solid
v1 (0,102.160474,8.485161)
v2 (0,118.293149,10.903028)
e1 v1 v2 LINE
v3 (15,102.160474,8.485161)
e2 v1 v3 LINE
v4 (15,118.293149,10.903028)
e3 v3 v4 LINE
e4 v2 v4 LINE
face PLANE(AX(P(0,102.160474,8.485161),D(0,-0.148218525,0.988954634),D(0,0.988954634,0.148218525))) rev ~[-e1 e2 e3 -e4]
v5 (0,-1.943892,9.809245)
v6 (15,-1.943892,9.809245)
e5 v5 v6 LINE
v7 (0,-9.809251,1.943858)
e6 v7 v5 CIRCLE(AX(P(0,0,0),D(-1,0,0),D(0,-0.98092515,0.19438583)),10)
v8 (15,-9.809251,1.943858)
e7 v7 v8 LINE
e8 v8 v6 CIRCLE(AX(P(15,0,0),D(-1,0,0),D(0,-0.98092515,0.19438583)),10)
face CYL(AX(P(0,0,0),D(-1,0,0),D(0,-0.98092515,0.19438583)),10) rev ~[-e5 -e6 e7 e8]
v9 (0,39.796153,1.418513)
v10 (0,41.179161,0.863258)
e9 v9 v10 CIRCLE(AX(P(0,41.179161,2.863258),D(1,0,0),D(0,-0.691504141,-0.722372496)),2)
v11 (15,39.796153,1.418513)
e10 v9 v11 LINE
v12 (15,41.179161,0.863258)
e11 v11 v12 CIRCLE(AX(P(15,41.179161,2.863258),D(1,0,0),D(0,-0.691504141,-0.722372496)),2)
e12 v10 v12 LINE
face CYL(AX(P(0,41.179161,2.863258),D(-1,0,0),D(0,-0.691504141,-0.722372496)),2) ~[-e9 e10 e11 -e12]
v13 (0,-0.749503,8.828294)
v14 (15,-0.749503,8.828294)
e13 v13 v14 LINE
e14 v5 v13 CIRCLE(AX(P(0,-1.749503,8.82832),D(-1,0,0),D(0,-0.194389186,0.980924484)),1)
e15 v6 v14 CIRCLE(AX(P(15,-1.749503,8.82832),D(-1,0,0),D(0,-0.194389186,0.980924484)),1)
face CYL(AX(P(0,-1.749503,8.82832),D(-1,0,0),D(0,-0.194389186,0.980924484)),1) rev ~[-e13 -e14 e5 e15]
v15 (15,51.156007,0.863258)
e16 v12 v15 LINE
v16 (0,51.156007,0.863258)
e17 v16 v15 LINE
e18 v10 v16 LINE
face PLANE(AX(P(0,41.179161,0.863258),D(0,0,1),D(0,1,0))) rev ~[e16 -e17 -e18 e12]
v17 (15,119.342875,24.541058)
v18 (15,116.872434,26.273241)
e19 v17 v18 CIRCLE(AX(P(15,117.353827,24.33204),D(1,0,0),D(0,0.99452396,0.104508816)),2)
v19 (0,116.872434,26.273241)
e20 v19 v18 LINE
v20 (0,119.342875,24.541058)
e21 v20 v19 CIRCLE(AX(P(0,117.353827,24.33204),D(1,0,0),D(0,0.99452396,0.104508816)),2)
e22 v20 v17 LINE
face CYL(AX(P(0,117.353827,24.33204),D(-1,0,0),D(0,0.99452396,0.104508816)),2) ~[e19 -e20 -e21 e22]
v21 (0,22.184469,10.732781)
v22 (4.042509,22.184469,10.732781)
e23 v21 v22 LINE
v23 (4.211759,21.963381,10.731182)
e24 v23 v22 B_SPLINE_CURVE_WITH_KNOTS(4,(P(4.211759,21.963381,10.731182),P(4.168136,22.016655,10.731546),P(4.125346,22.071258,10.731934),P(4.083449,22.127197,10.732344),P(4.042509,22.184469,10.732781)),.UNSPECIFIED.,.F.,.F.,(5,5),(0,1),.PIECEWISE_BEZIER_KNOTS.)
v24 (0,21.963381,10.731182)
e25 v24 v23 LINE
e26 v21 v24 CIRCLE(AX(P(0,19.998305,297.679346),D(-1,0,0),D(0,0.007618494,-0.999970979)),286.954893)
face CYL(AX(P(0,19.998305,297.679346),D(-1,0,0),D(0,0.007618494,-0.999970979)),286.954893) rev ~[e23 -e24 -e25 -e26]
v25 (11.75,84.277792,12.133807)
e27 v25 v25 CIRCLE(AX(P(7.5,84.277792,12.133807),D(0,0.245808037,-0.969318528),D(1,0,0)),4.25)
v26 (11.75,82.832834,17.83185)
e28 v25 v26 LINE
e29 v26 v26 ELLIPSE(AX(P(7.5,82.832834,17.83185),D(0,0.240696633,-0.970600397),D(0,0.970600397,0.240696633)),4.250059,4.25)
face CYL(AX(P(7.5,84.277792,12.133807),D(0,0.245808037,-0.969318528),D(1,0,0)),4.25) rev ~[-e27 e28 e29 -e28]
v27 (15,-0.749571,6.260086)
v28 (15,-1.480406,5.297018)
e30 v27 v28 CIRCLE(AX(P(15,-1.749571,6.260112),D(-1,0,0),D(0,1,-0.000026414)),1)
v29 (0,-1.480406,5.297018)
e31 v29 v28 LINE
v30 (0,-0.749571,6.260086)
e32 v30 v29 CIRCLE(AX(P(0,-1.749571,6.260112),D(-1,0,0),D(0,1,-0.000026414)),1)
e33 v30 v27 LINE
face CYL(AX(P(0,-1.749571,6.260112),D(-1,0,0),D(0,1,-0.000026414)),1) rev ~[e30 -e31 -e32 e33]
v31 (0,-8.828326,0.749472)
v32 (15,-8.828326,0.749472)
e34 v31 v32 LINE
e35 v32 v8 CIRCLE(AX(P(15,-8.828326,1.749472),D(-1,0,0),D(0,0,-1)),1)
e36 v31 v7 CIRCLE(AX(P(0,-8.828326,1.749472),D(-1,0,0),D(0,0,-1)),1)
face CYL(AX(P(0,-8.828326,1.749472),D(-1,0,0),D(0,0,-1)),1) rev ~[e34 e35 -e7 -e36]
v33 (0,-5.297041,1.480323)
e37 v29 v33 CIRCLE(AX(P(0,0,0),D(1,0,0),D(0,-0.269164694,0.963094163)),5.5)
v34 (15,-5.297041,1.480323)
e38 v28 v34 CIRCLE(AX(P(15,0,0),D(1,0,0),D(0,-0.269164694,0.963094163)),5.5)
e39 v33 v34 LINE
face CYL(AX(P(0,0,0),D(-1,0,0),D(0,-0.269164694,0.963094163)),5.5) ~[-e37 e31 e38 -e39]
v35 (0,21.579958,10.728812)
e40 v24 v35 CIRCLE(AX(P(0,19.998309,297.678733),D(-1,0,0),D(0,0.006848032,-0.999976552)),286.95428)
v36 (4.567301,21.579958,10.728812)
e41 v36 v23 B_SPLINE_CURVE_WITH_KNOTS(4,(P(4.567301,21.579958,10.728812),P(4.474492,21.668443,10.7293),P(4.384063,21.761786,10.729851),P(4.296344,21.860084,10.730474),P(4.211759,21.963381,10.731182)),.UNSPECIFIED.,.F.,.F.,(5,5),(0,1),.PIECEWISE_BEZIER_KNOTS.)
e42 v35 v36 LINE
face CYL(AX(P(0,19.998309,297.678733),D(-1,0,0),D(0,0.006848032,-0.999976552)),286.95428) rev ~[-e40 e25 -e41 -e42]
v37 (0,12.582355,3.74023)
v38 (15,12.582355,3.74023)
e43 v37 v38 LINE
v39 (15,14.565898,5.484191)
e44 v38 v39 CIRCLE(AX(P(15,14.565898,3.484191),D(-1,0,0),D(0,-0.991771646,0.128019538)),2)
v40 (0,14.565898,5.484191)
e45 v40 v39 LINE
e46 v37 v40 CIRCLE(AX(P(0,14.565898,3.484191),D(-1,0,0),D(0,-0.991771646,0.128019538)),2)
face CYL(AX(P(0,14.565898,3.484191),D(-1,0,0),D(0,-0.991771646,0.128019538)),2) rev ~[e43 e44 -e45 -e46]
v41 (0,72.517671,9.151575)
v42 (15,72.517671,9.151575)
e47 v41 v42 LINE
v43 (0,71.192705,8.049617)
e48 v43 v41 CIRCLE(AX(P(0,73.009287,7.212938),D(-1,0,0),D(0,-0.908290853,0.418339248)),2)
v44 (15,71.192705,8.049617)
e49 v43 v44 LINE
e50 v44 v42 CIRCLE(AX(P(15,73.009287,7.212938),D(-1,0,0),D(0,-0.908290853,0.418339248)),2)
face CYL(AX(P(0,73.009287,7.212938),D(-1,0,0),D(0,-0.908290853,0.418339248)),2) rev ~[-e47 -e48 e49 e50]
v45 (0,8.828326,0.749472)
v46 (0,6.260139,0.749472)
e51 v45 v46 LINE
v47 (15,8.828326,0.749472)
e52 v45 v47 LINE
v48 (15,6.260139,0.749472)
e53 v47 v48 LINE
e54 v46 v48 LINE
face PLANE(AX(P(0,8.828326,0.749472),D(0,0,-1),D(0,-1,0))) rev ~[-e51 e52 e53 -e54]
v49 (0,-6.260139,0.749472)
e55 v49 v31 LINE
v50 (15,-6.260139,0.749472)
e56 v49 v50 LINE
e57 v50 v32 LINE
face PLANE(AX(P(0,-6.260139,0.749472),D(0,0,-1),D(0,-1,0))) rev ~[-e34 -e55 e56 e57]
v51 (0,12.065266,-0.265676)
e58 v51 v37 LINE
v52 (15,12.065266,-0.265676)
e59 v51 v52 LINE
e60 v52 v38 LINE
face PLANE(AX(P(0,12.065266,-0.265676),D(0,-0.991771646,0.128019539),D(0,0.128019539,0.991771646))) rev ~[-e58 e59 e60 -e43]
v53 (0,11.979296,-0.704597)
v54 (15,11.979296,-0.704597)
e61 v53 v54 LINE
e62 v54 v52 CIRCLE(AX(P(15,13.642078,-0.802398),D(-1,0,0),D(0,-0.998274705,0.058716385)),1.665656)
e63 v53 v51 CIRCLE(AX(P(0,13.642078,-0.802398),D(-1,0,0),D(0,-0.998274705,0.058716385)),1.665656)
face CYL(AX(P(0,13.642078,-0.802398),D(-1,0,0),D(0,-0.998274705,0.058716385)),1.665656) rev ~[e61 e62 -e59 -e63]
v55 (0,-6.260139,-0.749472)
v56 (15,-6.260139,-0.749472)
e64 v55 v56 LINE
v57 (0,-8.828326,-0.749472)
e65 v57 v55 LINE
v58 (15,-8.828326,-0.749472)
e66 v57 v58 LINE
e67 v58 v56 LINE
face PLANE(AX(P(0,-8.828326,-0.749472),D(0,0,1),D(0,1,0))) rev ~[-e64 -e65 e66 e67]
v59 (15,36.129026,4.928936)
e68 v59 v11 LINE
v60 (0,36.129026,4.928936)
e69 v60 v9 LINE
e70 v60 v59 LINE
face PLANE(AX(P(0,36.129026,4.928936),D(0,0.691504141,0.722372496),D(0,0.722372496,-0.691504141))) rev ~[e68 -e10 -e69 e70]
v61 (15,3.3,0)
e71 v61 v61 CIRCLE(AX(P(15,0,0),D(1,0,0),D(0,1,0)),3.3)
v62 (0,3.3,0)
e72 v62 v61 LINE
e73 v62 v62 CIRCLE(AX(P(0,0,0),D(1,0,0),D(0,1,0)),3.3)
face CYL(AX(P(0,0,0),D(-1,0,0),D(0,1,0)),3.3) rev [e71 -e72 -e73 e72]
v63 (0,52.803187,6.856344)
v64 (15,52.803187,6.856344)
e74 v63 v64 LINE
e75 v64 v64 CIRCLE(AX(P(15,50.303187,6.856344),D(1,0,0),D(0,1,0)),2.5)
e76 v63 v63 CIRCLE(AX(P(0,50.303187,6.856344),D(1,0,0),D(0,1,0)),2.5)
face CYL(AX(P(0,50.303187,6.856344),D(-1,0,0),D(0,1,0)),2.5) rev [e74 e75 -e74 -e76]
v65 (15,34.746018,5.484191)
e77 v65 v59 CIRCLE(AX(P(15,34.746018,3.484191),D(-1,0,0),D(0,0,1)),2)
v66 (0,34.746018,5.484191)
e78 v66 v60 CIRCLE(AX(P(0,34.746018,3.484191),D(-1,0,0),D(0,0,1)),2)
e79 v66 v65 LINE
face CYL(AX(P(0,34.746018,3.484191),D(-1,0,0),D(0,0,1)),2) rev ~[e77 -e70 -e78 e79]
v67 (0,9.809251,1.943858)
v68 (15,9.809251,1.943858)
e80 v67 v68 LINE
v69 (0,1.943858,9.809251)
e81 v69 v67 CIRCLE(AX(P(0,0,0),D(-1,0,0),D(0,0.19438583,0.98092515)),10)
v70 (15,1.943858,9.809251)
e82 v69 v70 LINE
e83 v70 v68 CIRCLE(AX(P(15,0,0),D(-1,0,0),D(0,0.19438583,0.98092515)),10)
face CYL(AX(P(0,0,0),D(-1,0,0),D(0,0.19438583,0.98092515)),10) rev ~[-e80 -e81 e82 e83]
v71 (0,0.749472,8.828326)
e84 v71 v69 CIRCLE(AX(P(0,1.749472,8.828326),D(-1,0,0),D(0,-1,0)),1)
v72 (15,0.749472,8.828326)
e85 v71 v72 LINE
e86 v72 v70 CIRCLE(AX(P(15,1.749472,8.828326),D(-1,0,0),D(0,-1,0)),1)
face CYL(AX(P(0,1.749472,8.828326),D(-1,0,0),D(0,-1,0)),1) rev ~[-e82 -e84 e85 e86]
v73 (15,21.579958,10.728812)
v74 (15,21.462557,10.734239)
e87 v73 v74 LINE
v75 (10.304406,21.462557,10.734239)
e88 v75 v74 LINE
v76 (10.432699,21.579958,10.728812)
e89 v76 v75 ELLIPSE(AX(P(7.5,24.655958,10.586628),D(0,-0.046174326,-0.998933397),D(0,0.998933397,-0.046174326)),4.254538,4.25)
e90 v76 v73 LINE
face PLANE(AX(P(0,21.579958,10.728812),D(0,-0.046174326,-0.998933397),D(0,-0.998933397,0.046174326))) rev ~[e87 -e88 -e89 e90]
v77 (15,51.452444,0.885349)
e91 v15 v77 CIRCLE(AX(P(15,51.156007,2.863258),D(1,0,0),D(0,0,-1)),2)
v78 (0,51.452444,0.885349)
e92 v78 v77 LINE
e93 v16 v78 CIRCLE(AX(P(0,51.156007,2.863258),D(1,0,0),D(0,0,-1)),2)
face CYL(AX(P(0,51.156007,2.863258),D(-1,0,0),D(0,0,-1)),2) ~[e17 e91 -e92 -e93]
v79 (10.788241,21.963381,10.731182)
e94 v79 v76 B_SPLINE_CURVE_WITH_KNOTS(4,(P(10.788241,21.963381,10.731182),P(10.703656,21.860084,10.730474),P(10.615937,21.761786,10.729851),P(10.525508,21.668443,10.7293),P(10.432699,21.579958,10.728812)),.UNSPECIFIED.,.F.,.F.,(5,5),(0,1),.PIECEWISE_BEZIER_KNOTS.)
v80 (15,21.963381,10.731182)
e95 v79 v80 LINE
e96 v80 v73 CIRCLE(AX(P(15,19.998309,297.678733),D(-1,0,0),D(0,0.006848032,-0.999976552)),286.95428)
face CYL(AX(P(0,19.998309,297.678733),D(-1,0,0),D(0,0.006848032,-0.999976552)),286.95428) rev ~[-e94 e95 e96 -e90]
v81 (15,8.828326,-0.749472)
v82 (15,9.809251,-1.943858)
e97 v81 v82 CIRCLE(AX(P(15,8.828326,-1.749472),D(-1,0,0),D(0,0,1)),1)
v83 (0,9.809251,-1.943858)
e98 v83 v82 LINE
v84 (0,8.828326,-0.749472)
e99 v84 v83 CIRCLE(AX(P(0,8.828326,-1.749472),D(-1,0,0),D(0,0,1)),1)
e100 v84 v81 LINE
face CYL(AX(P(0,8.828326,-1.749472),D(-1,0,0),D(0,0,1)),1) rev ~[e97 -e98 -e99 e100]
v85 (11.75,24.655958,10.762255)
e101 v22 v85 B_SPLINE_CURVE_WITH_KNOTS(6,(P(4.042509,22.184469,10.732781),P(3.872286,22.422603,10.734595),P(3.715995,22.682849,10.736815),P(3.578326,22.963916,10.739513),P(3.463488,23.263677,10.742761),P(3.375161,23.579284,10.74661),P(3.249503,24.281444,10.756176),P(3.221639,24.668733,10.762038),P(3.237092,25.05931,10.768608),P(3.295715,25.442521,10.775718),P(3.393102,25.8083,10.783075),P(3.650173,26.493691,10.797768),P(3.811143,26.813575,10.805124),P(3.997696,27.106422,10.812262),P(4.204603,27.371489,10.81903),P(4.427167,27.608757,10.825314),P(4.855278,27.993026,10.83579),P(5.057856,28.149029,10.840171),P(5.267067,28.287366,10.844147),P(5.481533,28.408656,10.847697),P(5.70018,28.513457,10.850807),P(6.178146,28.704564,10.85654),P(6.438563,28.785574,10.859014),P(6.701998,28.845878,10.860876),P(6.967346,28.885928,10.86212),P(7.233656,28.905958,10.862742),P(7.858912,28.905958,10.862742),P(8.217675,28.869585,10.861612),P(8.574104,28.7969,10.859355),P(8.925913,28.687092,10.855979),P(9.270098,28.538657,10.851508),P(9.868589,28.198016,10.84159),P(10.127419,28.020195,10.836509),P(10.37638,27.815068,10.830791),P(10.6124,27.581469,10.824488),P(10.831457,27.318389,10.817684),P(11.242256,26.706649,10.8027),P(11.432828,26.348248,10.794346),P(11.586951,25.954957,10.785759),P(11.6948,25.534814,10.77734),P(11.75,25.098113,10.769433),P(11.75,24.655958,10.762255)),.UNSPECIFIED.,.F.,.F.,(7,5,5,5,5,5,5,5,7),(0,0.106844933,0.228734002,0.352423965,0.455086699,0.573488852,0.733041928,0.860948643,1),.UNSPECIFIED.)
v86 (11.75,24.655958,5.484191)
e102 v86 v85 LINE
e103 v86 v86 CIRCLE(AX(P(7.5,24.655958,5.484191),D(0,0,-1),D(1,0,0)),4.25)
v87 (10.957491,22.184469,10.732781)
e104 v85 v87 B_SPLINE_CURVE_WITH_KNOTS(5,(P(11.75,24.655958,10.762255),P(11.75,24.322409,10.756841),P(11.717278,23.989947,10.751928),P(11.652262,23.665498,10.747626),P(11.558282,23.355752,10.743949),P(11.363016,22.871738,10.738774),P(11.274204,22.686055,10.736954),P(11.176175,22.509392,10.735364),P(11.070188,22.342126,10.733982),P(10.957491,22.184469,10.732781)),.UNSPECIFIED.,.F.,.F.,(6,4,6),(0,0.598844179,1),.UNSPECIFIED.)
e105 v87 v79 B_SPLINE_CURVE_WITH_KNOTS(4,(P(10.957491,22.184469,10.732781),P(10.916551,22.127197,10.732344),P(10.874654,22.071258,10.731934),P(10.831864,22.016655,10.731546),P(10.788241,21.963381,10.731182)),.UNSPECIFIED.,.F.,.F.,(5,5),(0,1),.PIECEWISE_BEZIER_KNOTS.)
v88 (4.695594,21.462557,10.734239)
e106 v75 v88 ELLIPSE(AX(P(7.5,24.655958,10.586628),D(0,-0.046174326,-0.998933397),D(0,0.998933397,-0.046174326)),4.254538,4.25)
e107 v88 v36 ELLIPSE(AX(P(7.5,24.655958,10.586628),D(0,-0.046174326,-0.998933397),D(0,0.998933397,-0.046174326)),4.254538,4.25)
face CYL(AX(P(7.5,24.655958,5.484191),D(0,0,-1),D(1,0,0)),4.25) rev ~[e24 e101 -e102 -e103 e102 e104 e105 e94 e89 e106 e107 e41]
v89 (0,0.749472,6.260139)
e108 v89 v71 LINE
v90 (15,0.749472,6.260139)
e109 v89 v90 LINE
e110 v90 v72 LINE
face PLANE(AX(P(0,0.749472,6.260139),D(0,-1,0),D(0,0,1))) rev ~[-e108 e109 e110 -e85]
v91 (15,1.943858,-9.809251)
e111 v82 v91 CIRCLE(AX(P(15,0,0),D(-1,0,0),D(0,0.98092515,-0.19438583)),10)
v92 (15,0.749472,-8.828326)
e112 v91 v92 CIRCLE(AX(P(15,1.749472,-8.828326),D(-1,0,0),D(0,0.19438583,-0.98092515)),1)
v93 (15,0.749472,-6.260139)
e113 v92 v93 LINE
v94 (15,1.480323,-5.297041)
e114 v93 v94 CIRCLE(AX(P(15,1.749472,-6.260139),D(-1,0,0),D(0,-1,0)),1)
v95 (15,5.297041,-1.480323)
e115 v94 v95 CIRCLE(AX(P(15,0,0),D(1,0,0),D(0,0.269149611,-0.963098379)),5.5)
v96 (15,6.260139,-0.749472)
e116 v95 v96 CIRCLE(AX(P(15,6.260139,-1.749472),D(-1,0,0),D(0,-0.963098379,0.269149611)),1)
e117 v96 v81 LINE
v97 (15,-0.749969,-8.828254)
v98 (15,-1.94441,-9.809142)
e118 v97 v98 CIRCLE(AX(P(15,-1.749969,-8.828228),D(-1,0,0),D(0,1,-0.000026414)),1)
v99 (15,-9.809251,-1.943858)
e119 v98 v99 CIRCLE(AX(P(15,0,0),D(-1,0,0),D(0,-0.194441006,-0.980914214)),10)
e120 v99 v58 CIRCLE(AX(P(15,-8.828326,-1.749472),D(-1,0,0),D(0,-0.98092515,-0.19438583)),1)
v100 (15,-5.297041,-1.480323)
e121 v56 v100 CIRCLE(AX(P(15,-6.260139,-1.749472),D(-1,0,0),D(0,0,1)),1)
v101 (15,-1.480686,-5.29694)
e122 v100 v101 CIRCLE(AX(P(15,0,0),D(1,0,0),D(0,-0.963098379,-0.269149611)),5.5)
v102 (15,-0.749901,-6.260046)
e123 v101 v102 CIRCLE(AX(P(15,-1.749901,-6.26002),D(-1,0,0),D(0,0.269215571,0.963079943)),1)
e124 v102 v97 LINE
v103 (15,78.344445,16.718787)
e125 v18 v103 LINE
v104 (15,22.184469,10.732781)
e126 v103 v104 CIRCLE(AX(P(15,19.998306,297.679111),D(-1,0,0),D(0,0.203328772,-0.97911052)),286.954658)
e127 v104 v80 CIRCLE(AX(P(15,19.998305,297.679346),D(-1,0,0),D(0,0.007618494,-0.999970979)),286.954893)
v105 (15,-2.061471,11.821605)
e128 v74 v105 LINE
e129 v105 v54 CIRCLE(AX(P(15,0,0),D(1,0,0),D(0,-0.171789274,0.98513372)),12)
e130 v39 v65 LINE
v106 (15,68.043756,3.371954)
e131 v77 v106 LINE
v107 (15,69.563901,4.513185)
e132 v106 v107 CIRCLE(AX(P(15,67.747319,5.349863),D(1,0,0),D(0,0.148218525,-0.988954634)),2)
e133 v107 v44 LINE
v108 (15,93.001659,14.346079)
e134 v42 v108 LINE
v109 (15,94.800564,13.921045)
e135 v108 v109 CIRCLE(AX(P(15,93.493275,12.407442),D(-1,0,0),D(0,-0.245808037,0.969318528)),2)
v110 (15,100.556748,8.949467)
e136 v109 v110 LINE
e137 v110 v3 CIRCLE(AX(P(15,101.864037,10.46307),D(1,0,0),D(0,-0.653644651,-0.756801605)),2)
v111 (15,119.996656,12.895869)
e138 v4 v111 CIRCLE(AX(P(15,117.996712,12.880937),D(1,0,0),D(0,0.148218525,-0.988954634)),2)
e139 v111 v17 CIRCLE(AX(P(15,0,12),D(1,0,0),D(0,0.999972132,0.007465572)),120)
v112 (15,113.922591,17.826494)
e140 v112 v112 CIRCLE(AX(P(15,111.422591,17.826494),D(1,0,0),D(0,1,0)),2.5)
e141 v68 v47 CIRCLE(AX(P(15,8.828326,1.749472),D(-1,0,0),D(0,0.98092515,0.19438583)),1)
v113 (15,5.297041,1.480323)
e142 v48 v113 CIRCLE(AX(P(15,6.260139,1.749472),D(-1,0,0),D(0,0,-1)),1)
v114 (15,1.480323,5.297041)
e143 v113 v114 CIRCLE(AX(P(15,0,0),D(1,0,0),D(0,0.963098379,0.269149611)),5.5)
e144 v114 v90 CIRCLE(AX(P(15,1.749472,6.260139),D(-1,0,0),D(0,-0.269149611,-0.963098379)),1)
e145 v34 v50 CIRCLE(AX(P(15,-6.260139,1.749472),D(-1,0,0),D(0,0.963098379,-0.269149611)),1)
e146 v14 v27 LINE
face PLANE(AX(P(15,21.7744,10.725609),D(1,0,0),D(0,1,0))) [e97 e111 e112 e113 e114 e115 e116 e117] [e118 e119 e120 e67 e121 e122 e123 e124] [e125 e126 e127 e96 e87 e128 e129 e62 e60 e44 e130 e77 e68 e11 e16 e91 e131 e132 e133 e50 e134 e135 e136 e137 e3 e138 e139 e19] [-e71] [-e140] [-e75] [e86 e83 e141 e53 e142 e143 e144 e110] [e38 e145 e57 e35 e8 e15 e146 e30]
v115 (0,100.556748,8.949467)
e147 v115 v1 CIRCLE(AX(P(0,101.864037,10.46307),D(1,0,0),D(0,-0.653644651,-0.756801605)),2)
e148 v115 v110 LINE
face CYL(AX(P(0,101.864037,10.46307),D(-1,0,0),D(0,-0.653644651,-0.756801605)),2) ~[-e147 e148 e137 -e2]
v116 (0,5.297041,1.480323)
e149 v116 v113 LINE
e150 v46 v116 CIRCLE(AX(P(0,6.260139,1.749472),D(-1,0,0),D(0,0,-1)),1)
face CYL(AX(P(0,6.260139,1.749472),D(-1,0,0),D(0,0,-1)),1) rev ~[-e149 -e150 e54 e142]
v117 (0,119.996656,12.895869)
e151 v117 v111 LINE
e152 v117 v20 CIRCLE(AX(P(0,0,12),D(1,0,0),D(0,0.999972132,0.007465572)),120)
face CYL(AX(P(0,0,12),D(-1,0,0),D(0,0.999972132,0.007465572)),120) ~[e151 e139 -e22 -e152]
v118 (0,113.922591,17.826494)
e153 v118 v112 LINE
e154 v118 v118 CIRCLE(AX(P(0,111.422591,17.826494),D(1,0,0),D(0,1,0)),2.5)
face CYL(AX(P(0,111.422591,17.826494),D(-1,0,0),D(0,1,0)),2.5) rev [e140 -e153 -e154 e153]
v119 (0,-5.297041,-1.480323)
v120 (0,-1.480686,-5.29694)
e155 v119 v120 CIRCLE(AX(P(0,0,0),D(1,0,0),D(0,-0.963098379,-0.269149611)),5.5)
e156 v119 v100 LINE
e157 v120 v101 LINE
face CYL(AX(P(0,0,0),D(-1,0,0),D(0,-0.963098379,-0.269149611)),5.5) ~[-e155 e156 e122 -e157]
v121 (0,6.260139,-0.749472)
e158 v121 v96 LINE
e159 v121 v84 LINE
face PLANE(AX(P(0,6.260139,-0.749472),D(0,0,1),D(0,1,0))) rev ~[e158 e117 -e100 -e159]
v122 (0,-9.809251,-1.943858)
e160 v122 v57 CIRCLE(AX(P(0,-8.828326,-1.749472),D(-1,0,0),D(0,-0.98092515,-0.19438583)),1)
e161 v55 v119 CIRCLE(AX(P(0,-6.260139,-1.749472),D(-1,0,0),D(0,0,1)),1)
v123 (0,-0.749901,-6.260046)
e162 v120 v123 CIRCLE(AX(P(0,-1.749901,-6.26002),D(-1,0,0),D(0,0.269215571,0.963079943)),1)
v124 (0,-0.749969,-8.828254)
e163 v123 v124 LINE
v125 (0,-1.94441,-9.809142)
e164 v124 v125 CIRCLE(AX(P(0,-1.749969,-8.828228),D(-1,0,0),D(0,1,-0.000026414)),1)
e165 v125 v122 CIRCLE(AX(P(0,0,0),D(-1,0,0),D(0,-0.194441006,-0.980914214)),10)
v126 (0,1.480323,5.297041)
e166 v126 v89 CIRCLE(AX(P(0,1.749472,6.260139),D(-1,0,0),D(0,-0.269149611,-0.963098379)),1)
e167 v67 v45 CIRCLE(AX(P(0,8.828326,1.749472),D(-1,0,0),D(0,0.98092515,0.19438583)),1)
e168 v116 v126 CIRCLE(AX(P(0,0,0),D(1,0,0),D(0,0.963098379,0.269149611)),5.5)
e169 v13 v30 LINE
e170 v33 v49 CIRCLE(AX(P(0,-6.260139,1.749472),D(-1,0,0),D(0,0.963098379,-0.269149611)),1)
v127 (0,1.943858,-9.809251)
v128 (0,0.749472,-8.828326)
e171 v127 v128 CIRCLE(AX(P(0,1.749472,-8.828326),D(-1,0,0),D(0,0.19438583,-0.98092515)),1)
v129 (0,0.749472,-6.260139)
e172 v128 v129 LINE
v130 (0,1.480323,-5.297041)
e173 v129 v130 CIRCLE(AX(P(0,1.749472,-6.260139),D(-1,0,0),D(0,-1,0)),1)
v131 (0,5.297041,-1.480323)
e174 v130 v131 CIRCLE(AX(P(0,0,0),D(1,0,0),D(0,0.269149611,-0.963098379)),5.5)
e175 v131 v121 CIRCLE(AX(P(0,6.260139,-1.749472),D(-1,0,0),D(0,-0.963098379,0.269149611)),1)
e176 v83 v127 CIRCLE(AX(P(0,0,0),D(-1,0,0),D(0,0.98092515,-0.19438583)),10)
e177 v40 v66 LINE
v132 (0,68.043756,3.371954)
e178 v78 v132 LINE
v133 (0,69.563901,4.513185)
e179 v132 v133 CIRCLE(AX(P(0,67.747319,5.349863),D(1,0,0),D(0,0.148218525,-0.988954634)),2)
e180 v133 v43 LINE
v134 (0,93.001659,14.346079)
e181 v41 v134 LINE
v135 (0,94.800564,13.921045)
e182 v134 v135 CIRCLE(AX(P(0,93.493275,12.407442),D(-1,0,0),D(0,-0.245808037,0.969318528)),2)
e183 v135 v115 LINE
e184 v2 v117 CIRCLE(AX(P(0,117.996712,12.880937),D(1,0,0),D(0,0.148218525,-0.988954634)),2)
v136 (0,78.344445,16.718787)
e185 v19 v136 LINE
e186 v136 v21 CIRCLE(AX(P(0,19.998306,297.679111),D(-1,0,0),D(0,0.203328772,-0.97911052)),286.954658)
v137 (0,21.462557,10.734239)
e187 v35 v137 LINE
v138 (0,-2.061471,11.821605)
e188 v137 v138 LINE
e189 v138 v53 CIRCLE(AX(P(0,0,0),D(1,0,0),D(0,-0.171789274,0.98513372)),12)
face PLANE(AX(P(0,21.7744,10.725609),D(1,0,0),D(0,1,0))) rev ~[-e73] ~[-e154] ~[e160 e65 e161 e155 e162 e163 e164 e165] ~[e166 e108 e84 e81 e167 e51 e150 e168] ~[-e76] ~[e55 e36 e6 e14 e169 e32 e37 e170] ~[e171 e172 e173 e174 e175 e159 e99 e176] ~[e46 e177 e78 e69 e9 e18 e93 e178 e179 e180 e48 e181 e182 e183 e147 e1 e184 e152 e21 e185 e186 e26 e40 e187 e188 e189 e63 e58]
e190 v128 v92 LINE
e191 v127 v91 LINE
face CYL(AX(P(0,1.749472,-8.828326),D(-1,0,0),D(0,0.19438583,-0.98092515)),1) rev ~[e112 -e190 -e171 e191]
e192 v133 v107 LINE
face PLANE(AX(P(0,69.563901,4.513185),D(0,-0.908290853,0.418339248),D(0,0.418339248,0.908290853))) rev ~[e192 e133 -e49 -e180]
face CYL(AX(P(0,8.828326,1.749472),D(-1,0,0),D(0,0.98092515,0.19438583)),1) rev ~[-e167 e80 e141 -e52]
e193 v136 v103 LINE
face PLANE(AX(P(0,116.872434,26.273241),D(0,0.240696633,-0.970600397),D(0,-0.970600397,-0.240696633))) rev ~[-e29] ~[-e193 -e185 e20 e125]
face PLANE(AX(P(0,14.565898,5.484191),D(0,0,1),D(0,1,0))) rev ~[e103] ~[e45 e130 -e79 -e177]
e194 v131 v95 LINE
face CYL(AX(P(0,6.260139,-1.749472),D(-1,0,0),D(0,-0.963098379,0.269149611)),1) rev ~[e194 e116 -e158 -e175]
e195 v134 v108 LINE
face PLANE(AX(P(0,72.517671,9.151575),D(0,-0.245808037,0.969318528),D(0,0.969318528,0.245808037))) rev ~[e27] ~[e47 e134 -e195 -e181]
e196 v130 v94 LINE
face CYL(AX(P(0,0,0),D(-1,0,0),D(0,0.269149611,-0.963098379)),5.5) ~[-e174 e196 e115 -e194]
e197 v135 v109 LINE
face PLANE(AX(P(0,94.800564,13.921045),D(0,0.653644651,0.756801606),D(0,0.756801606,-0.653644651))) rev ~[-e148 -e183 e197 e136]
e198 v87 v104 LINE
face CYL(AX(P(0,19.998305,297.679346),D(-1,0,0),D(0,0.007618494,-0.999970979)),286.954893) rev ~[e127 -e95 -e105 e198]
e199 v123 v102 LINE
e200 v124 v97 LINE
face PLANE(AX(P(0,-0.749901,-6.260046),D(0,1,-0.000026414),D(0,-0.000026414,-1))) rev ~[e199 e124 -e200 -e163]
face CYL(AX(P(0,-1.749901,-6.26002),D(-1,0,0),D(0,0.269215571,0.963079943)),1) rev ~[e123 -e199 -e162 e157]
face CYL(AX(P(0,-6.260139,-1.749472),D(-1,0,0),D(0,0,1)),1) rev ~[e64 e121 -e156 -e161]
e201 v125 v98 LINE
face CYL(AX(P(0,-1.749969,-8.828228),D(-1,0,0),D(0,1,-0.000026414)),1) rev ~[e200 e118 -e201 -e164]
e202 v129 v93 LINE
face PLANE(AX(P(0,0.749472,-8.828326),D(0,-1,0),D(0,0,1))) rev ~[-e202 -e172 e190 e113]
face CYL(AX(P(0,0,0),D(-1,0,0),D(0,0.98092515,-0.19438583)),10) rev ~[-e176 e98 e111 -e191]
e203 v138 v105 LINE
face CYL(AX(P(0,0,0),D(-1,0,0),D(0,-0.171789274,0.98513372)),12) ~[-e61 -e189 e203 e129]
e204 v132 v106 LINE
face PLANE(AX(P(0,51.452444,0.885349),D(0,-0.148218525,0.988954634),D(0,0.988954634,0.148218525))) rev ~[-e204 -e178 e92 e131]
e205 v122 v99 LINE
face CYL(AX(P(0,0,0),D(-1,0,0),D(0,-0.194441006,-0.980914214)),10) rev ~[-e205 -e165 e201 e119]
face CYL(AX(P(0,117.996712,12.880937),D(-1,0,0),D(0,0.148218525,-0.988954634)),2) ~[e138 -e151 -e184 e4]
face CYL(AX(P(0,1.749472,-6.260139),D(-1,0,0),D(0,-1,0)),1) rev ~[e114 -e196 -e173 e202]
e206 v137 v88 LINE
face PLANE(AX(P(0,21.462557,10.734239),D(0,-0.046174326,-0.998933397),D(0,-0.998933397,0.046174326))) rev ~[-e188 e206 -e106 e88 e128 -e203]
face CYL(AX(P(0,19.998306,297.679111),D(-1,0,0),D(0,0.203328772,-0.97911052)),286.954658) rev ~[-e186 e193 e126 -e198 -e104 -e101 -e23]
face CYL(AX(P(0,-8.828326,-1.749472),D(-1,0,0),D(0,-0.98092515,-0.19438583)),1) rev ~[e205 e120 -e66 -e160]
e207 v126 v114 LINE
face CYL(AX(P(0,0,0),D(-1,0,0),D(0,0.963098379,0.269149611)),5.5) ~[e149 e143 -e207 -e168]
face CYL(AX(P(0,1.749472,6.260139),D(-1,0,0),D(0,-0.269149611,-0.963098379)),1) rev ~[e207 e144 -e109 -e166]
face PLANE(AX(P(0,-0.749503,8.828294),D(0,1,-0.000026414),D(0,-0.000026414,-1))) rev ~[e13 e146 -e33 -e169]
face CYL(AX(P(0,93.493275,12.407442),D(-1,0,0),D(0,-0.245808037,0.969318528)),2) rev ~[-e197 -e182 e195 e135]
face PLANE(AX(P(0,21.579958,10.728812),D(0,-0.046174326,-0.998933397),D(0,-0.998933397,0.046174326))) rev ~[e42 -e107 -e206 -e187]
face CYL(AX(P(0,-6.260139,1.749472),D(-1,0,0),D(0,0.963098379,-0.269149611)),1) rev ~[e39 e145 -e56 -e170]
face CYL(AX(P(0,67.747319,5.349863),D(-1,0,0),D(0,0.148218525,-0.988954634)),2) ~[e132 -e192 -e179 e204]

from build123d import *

# Parameters (mm, degrees)
F0_R     = 3.3
F0_R_2   = 2.5
F1_DEPTH = 15
F2_R     = 4.25
F3_DEPTH = 7.6
F4_R     = 4.25
F5_DEPTH = 15.8


# Not quite as in the source:
# - a feature names something its author has since deleted; it is built from what else it names


with BuildPart() as f1:
    # F0 (on Right) → F1 (new body)
    with BuildSketch(Plane.YZ):
        with BuildLine():
            ThreePointArc((21.8315579223, 10.717182122), (21.897134346, 10.7177196915), (21.9626931438, 10.7193322557))
            ThreePointArc((21.9626931438, 10.7193322557), (21.9630378123, 10.7252568669), (21.9633808826, 10.731181571))
            ThreePointArc((21.9633808826, 10.731181571), (21.7716697335, 10.7299327404), (21.5799577929, 10.728811993))
            Line((21.5799577929, 10.728811993), (21.8315579223, 10.717182122))
        make_face()
        with BuildLine():
            ThreePointArc((22.1844688263, 10.7327808001), (22.0736743793, 10.7245163933), (21.9626931438, 10.7193322557))
            ThreePointArc((21.9626931438, 10.7193322557), (21.897134346, 10.7177196915), (21.8315579223, 10.717182122))
            ThreePointArc((21.8315579223, 10.717182122), (21.6468606164, 10.7214485341), (21.4625573078, 10.7342386694))
            Line((21.4625573078, 10.7342386694), (-2.0614712889, 11.8216046341))
            ThreePointArc((-2.0614712889, 11.8216046341), (-7.9885695505, -8.9544824829), (11.9792964571, -0.7045966171))
            ThreePointArc((11.9792964571, -0.7045966171), (12.0074816864, -0.4822378377), (12.0652655082, -0.2656763826))
            Line((12.0652655082, -0.2656763826), (12.5823545671, 3.7402298466))
            ThreePointArc((12.5823545671, 3.7402298466), (13.2453067327, 4.9862024463), (14.565897859, 5.4841907695))
            Line((14.565897859, 5.4841907695), (34.746018001, 5.4841907695))
            ThreePointArc((34.746018001, 5.4841907695), (35.4911723527, 5.3401931919), (36.1290262829, 4.9289357615))
            Line((36.1290262829, 4.9289357615), (39.7961525429, 1.4185128035))
            ThreePointArc((39.7961525429, 1.4185128035), (40.4340064731, 1.0072553731), (41.1791608249, 0.8632577956))
            Line((41.1791608249, 0.8632577956), (51.1560065331, 0.8632577956))
            ThreePointArc((51.1560065331, 0.8632577956), (51.3046360431, 0.8687881245), (51.452443583, 0.8853485268))
            Line((51.452443583, 0.8853485268), (68.043755982, 3.3719538424))
            ThreePointArc((68.043755982, 3.3719538424), (68.9480745213, 3.750430082), (69.5639006382, 4.5131846154))
            Line((69.5639006382, 4.5131846154), (71.1927053136, 8.0496168184))
            ThreePointArc((71.1927053136, 8.0496168184), (71.7304115705, 8.7506241115), (72.5176709464, 9.151575379))
            Line((72.5176709464, 9.151575379), (93.0016589096, 14.3460792675))
            ThreePointArc((93.0016589096, 14.3460792675), (93.9531599103, 14.3538506609), (94.800564285, 13.9210454222))
            Line((94.800564285, 13.9210454222), (100.5567479715, 8.9494668086))
            ThreePointArc((100.5567479715, 8.9494668086), (101.3078443235, 8.5419637232), (102.1604743235, 8.4851607509))
            Line((102.1604743235, 8.4851607509), (118.2931486533, 10.9030281733))
            ThreePointArc((118.2931486533, 10.9030281733), (119.516973098, 11.5813971433), (119.9966558679, 12.8958685851))
            ThreePointArc((119.9966558679, 12.8958685851), (119.8113324935, 18.7264110882), (119.3428752162, 24.5410579746))
            ThreePointArc((119.3428752162, 24.5410579746), (118.5020303548, 25.9696085801), (116.872434029, 26.2732411356))
            Line((116.872434029, 26.2732411356), (78.344444671, 16.7187866332))
            ThreePointArc((78.344444671, 16.7187866332), (50.4120849121, 12.3407543123), (22.1844688263, 10.7327808001))
        make_face()
        with BuildLine():
            ThreePointArc((-9.8092514957, -1.9438583008), (-9.6011089256, -1.114801623), (-8.8283263462, -0.7494724707))
            Line((-8.8283263462, -0.7494724707), (-6.2601394612, -0.7494724707))
            ThreePointArc((-6.2601394612, -0.7494724707), (-5.6556353715, -0.9528704337), (-5.2970410826, -1.4803228598))
            ThreePointArc((-5.2970410826, -1.4803228598), (-3.8892204731, -3.8889541154), (-1.4806856428, -5.2969396851))
            ThreePointArc((-1.4806856428, -5.2969396851), (-0.9532704937, -5.6555533383), (-0.7499012145, -6.2600460414))
            Line((-0.7499012145, -6.2600460414), (-0.7499690502, -8.8282543402))
            ThreePointArc((-0.7499690502, -8.8282543402), (-1.1153301427, -9.6010367371), (-1.9444100554, -9.8091421407))
            ThreePointArc((-1.9444100554, -9.8091421407), (-7.0712666783, -7.0708689399), (-9.8092514957, -1.9438583008))
        make_face(mode=Mode.SUBTRACT)
        with BuildLine():
            ThreePointArc((9.8092514957, -1.9438583008), (7.0710678119, -7.0710678119), (1.9438583008, -9.8092514957))
            ThreePointArc((1.9438583008, -9.8092514957), (1.114801623, -9.6011089256), (0.7494724707, -8.8283263462))
            Line((0.7494724707, -8.8283263462), (0.7494724707, -6.2601394612))
            ThreePointArc((0.7494724707, -6.2601394612), (0.9528704337, -5.6556353715), (1.4803228598, -5.2970410826))
            ThreePointArc((1.4803228598, -5.2970410826), (3.8890872965, -3.8890872965), (5.2970410826, -1.4803228598))
            ThreePointArc((5.2970410826, -1.4803228598), (5.6556353715, -0.9528704337), (6.2601394612, -0.7494724707))
            Line((6.2601394612, -0.7494724707), (8.8283263462, -0.7494724707))
            ThreePointArc((8.8283263462, -0.7494724707), (9.6011089256, -1.114801623), (9.8092514957, -1.9438583008))
        make_face(mode=Mode.SUBTRACT)
        Circle(F0_R, mode=Mode.SUBTRACT)
        with BuildLine():
            Line((-6.2601394612, 0.7494724707), (-8.8283263462, 0.7494724707))
            ThreePointArc((-8.8283263462, 0.7494724707), (-9.6011089256, 1.114801623), (-9.8092514957, 1.9438583008))
            ThreePointArc((-9.8092514957, 1.9438583008), (-7.0710799085, 7.0710557152), (-1.9438918628, 9.8092448448))
            ThreePointArc((-1.9438918628, 9.8092448448), (-1.1148229448, 9.6010956435), (-0.7495026768, 8.8282939467))
            Line((-0.7495026768, 8.8282939467), (-0.7495705125, 6.2600856479))
            ThreePointArc((-0.7495705125, 6.2600856479), (-0.9529717251, 5.6556036891), (-1.480405818, 5.2970178982))
            ThreePointArc((-1.480405818, 5.2970178982), (-3.8891177504, 3.8890568424), (-5.2970410826, 1.4803228598))
            ThreePointArc((-5.2970410826, 1.4803228598), (-5.6556353715, 0.9528704337), (-6.2601394612, 0.7494724707))
        make_face(mode=Mode.SUBTRACT)
        with BuildLine():
            Line((0.7494724707, 6.2601394612), (0.7494724707, 8.8283263462))
            ThreePointArc((0.7494724707, 8.8283263462), (1.114801623, 9.6011089256), (1.9438583008, 9.8092514957))
            ThreePointArc((1.9438583008, 9.8092514957), (7.0710678119, 7.0710678119), (9.8092514957, 1.9438583008))
            ThreePointArc((9.8092514957, 1.9438583008), (9.6011089256, 1.114801623), (8.8283263462, 0.7494724707))
            Line((8.8283263462, 0.7494724707), (6.2601394612, 0.7494724707))
            ThreePointArc((6.2601394612, 0.7494724707), (5.6556353715, 0.9528704337), (5.2970410826, 1.4803228598))
            ThreePointArc((5.2970410826, 1.4803228598), (3.8890872965, 3.8890872965), (1.4803228598, 5.2970410826))
            ThreePointArc((1.4803228598, 5.2970410826), (0.9528704337, 5.6556353715), (0.7494724707, 6.2601394612))
        make_face(mode=Mode.SUBTRACT)
        with Locations((50.3031872213, 6.8563437089)):
            Circle(F0_R_2, mode=Mode.SUBTRACT)
        with Locations((111.4225909114, 17.8264938295)):
            Circle(F0_R_2, mode=Mode.SUBTRACT)
        with BuildLine():
            ThreePointArc((21.9633808826, 10.731181571), (21.9630378123, 10.7252568669), (21.9626931438, 10.7193322557))
            ThreePointArc((21.9626931438, 10.7193322557), (22.0736743793, 10.7245163933), (22.1844688263, 10.7327808001))
            ThreePointArc((22.1844688263, 10.7327808001), (22.0739250085, 10.7319598925), (21.9633808826, 10.731181571))
        make_face()
        with BuildLine():
            ThreePointArc((21.4625573078, 10.7342386694), (21.6468606164, 10.7214485341), (21.8315579223, 10.717182122))
            Line((21.8315579223, 10.717182122), (21.5799577929, 10.728811993))
            Line((21.5799577929, 10.728811993), (21.4625573078, 10.7342386694))
        make_face()
    extrude(amount=F1_DEPTH)

    # F2 (on face) → F3 (cut)
    with BuildSketch(Plane(origin=(0, 0, 5.4841907695), x_dir=(1, 0, 0), z_dir=(0, 0, -1))):
        with Locations((7.5, -24.65595793)):
            Circle(F2_R)
    extrude(amount=-F3_DEPTH, mode=Mode.SUBTRACT)

    # F4 (on face) → F5 (cut)
    with BuildSketch(Plane(origin=(0, 2.2011211845, -8.6798933673), x_dir=(1, 0, 0), z_dir=(0, 0.2458080366, -0.9693185282))):
        with Locations((7.5, -84.6746127131)):
            Circle(F4_R)
    extrude(amount=-F5_DEPTH, mode=Mode.SUBTRACT)


solid = f1.part
